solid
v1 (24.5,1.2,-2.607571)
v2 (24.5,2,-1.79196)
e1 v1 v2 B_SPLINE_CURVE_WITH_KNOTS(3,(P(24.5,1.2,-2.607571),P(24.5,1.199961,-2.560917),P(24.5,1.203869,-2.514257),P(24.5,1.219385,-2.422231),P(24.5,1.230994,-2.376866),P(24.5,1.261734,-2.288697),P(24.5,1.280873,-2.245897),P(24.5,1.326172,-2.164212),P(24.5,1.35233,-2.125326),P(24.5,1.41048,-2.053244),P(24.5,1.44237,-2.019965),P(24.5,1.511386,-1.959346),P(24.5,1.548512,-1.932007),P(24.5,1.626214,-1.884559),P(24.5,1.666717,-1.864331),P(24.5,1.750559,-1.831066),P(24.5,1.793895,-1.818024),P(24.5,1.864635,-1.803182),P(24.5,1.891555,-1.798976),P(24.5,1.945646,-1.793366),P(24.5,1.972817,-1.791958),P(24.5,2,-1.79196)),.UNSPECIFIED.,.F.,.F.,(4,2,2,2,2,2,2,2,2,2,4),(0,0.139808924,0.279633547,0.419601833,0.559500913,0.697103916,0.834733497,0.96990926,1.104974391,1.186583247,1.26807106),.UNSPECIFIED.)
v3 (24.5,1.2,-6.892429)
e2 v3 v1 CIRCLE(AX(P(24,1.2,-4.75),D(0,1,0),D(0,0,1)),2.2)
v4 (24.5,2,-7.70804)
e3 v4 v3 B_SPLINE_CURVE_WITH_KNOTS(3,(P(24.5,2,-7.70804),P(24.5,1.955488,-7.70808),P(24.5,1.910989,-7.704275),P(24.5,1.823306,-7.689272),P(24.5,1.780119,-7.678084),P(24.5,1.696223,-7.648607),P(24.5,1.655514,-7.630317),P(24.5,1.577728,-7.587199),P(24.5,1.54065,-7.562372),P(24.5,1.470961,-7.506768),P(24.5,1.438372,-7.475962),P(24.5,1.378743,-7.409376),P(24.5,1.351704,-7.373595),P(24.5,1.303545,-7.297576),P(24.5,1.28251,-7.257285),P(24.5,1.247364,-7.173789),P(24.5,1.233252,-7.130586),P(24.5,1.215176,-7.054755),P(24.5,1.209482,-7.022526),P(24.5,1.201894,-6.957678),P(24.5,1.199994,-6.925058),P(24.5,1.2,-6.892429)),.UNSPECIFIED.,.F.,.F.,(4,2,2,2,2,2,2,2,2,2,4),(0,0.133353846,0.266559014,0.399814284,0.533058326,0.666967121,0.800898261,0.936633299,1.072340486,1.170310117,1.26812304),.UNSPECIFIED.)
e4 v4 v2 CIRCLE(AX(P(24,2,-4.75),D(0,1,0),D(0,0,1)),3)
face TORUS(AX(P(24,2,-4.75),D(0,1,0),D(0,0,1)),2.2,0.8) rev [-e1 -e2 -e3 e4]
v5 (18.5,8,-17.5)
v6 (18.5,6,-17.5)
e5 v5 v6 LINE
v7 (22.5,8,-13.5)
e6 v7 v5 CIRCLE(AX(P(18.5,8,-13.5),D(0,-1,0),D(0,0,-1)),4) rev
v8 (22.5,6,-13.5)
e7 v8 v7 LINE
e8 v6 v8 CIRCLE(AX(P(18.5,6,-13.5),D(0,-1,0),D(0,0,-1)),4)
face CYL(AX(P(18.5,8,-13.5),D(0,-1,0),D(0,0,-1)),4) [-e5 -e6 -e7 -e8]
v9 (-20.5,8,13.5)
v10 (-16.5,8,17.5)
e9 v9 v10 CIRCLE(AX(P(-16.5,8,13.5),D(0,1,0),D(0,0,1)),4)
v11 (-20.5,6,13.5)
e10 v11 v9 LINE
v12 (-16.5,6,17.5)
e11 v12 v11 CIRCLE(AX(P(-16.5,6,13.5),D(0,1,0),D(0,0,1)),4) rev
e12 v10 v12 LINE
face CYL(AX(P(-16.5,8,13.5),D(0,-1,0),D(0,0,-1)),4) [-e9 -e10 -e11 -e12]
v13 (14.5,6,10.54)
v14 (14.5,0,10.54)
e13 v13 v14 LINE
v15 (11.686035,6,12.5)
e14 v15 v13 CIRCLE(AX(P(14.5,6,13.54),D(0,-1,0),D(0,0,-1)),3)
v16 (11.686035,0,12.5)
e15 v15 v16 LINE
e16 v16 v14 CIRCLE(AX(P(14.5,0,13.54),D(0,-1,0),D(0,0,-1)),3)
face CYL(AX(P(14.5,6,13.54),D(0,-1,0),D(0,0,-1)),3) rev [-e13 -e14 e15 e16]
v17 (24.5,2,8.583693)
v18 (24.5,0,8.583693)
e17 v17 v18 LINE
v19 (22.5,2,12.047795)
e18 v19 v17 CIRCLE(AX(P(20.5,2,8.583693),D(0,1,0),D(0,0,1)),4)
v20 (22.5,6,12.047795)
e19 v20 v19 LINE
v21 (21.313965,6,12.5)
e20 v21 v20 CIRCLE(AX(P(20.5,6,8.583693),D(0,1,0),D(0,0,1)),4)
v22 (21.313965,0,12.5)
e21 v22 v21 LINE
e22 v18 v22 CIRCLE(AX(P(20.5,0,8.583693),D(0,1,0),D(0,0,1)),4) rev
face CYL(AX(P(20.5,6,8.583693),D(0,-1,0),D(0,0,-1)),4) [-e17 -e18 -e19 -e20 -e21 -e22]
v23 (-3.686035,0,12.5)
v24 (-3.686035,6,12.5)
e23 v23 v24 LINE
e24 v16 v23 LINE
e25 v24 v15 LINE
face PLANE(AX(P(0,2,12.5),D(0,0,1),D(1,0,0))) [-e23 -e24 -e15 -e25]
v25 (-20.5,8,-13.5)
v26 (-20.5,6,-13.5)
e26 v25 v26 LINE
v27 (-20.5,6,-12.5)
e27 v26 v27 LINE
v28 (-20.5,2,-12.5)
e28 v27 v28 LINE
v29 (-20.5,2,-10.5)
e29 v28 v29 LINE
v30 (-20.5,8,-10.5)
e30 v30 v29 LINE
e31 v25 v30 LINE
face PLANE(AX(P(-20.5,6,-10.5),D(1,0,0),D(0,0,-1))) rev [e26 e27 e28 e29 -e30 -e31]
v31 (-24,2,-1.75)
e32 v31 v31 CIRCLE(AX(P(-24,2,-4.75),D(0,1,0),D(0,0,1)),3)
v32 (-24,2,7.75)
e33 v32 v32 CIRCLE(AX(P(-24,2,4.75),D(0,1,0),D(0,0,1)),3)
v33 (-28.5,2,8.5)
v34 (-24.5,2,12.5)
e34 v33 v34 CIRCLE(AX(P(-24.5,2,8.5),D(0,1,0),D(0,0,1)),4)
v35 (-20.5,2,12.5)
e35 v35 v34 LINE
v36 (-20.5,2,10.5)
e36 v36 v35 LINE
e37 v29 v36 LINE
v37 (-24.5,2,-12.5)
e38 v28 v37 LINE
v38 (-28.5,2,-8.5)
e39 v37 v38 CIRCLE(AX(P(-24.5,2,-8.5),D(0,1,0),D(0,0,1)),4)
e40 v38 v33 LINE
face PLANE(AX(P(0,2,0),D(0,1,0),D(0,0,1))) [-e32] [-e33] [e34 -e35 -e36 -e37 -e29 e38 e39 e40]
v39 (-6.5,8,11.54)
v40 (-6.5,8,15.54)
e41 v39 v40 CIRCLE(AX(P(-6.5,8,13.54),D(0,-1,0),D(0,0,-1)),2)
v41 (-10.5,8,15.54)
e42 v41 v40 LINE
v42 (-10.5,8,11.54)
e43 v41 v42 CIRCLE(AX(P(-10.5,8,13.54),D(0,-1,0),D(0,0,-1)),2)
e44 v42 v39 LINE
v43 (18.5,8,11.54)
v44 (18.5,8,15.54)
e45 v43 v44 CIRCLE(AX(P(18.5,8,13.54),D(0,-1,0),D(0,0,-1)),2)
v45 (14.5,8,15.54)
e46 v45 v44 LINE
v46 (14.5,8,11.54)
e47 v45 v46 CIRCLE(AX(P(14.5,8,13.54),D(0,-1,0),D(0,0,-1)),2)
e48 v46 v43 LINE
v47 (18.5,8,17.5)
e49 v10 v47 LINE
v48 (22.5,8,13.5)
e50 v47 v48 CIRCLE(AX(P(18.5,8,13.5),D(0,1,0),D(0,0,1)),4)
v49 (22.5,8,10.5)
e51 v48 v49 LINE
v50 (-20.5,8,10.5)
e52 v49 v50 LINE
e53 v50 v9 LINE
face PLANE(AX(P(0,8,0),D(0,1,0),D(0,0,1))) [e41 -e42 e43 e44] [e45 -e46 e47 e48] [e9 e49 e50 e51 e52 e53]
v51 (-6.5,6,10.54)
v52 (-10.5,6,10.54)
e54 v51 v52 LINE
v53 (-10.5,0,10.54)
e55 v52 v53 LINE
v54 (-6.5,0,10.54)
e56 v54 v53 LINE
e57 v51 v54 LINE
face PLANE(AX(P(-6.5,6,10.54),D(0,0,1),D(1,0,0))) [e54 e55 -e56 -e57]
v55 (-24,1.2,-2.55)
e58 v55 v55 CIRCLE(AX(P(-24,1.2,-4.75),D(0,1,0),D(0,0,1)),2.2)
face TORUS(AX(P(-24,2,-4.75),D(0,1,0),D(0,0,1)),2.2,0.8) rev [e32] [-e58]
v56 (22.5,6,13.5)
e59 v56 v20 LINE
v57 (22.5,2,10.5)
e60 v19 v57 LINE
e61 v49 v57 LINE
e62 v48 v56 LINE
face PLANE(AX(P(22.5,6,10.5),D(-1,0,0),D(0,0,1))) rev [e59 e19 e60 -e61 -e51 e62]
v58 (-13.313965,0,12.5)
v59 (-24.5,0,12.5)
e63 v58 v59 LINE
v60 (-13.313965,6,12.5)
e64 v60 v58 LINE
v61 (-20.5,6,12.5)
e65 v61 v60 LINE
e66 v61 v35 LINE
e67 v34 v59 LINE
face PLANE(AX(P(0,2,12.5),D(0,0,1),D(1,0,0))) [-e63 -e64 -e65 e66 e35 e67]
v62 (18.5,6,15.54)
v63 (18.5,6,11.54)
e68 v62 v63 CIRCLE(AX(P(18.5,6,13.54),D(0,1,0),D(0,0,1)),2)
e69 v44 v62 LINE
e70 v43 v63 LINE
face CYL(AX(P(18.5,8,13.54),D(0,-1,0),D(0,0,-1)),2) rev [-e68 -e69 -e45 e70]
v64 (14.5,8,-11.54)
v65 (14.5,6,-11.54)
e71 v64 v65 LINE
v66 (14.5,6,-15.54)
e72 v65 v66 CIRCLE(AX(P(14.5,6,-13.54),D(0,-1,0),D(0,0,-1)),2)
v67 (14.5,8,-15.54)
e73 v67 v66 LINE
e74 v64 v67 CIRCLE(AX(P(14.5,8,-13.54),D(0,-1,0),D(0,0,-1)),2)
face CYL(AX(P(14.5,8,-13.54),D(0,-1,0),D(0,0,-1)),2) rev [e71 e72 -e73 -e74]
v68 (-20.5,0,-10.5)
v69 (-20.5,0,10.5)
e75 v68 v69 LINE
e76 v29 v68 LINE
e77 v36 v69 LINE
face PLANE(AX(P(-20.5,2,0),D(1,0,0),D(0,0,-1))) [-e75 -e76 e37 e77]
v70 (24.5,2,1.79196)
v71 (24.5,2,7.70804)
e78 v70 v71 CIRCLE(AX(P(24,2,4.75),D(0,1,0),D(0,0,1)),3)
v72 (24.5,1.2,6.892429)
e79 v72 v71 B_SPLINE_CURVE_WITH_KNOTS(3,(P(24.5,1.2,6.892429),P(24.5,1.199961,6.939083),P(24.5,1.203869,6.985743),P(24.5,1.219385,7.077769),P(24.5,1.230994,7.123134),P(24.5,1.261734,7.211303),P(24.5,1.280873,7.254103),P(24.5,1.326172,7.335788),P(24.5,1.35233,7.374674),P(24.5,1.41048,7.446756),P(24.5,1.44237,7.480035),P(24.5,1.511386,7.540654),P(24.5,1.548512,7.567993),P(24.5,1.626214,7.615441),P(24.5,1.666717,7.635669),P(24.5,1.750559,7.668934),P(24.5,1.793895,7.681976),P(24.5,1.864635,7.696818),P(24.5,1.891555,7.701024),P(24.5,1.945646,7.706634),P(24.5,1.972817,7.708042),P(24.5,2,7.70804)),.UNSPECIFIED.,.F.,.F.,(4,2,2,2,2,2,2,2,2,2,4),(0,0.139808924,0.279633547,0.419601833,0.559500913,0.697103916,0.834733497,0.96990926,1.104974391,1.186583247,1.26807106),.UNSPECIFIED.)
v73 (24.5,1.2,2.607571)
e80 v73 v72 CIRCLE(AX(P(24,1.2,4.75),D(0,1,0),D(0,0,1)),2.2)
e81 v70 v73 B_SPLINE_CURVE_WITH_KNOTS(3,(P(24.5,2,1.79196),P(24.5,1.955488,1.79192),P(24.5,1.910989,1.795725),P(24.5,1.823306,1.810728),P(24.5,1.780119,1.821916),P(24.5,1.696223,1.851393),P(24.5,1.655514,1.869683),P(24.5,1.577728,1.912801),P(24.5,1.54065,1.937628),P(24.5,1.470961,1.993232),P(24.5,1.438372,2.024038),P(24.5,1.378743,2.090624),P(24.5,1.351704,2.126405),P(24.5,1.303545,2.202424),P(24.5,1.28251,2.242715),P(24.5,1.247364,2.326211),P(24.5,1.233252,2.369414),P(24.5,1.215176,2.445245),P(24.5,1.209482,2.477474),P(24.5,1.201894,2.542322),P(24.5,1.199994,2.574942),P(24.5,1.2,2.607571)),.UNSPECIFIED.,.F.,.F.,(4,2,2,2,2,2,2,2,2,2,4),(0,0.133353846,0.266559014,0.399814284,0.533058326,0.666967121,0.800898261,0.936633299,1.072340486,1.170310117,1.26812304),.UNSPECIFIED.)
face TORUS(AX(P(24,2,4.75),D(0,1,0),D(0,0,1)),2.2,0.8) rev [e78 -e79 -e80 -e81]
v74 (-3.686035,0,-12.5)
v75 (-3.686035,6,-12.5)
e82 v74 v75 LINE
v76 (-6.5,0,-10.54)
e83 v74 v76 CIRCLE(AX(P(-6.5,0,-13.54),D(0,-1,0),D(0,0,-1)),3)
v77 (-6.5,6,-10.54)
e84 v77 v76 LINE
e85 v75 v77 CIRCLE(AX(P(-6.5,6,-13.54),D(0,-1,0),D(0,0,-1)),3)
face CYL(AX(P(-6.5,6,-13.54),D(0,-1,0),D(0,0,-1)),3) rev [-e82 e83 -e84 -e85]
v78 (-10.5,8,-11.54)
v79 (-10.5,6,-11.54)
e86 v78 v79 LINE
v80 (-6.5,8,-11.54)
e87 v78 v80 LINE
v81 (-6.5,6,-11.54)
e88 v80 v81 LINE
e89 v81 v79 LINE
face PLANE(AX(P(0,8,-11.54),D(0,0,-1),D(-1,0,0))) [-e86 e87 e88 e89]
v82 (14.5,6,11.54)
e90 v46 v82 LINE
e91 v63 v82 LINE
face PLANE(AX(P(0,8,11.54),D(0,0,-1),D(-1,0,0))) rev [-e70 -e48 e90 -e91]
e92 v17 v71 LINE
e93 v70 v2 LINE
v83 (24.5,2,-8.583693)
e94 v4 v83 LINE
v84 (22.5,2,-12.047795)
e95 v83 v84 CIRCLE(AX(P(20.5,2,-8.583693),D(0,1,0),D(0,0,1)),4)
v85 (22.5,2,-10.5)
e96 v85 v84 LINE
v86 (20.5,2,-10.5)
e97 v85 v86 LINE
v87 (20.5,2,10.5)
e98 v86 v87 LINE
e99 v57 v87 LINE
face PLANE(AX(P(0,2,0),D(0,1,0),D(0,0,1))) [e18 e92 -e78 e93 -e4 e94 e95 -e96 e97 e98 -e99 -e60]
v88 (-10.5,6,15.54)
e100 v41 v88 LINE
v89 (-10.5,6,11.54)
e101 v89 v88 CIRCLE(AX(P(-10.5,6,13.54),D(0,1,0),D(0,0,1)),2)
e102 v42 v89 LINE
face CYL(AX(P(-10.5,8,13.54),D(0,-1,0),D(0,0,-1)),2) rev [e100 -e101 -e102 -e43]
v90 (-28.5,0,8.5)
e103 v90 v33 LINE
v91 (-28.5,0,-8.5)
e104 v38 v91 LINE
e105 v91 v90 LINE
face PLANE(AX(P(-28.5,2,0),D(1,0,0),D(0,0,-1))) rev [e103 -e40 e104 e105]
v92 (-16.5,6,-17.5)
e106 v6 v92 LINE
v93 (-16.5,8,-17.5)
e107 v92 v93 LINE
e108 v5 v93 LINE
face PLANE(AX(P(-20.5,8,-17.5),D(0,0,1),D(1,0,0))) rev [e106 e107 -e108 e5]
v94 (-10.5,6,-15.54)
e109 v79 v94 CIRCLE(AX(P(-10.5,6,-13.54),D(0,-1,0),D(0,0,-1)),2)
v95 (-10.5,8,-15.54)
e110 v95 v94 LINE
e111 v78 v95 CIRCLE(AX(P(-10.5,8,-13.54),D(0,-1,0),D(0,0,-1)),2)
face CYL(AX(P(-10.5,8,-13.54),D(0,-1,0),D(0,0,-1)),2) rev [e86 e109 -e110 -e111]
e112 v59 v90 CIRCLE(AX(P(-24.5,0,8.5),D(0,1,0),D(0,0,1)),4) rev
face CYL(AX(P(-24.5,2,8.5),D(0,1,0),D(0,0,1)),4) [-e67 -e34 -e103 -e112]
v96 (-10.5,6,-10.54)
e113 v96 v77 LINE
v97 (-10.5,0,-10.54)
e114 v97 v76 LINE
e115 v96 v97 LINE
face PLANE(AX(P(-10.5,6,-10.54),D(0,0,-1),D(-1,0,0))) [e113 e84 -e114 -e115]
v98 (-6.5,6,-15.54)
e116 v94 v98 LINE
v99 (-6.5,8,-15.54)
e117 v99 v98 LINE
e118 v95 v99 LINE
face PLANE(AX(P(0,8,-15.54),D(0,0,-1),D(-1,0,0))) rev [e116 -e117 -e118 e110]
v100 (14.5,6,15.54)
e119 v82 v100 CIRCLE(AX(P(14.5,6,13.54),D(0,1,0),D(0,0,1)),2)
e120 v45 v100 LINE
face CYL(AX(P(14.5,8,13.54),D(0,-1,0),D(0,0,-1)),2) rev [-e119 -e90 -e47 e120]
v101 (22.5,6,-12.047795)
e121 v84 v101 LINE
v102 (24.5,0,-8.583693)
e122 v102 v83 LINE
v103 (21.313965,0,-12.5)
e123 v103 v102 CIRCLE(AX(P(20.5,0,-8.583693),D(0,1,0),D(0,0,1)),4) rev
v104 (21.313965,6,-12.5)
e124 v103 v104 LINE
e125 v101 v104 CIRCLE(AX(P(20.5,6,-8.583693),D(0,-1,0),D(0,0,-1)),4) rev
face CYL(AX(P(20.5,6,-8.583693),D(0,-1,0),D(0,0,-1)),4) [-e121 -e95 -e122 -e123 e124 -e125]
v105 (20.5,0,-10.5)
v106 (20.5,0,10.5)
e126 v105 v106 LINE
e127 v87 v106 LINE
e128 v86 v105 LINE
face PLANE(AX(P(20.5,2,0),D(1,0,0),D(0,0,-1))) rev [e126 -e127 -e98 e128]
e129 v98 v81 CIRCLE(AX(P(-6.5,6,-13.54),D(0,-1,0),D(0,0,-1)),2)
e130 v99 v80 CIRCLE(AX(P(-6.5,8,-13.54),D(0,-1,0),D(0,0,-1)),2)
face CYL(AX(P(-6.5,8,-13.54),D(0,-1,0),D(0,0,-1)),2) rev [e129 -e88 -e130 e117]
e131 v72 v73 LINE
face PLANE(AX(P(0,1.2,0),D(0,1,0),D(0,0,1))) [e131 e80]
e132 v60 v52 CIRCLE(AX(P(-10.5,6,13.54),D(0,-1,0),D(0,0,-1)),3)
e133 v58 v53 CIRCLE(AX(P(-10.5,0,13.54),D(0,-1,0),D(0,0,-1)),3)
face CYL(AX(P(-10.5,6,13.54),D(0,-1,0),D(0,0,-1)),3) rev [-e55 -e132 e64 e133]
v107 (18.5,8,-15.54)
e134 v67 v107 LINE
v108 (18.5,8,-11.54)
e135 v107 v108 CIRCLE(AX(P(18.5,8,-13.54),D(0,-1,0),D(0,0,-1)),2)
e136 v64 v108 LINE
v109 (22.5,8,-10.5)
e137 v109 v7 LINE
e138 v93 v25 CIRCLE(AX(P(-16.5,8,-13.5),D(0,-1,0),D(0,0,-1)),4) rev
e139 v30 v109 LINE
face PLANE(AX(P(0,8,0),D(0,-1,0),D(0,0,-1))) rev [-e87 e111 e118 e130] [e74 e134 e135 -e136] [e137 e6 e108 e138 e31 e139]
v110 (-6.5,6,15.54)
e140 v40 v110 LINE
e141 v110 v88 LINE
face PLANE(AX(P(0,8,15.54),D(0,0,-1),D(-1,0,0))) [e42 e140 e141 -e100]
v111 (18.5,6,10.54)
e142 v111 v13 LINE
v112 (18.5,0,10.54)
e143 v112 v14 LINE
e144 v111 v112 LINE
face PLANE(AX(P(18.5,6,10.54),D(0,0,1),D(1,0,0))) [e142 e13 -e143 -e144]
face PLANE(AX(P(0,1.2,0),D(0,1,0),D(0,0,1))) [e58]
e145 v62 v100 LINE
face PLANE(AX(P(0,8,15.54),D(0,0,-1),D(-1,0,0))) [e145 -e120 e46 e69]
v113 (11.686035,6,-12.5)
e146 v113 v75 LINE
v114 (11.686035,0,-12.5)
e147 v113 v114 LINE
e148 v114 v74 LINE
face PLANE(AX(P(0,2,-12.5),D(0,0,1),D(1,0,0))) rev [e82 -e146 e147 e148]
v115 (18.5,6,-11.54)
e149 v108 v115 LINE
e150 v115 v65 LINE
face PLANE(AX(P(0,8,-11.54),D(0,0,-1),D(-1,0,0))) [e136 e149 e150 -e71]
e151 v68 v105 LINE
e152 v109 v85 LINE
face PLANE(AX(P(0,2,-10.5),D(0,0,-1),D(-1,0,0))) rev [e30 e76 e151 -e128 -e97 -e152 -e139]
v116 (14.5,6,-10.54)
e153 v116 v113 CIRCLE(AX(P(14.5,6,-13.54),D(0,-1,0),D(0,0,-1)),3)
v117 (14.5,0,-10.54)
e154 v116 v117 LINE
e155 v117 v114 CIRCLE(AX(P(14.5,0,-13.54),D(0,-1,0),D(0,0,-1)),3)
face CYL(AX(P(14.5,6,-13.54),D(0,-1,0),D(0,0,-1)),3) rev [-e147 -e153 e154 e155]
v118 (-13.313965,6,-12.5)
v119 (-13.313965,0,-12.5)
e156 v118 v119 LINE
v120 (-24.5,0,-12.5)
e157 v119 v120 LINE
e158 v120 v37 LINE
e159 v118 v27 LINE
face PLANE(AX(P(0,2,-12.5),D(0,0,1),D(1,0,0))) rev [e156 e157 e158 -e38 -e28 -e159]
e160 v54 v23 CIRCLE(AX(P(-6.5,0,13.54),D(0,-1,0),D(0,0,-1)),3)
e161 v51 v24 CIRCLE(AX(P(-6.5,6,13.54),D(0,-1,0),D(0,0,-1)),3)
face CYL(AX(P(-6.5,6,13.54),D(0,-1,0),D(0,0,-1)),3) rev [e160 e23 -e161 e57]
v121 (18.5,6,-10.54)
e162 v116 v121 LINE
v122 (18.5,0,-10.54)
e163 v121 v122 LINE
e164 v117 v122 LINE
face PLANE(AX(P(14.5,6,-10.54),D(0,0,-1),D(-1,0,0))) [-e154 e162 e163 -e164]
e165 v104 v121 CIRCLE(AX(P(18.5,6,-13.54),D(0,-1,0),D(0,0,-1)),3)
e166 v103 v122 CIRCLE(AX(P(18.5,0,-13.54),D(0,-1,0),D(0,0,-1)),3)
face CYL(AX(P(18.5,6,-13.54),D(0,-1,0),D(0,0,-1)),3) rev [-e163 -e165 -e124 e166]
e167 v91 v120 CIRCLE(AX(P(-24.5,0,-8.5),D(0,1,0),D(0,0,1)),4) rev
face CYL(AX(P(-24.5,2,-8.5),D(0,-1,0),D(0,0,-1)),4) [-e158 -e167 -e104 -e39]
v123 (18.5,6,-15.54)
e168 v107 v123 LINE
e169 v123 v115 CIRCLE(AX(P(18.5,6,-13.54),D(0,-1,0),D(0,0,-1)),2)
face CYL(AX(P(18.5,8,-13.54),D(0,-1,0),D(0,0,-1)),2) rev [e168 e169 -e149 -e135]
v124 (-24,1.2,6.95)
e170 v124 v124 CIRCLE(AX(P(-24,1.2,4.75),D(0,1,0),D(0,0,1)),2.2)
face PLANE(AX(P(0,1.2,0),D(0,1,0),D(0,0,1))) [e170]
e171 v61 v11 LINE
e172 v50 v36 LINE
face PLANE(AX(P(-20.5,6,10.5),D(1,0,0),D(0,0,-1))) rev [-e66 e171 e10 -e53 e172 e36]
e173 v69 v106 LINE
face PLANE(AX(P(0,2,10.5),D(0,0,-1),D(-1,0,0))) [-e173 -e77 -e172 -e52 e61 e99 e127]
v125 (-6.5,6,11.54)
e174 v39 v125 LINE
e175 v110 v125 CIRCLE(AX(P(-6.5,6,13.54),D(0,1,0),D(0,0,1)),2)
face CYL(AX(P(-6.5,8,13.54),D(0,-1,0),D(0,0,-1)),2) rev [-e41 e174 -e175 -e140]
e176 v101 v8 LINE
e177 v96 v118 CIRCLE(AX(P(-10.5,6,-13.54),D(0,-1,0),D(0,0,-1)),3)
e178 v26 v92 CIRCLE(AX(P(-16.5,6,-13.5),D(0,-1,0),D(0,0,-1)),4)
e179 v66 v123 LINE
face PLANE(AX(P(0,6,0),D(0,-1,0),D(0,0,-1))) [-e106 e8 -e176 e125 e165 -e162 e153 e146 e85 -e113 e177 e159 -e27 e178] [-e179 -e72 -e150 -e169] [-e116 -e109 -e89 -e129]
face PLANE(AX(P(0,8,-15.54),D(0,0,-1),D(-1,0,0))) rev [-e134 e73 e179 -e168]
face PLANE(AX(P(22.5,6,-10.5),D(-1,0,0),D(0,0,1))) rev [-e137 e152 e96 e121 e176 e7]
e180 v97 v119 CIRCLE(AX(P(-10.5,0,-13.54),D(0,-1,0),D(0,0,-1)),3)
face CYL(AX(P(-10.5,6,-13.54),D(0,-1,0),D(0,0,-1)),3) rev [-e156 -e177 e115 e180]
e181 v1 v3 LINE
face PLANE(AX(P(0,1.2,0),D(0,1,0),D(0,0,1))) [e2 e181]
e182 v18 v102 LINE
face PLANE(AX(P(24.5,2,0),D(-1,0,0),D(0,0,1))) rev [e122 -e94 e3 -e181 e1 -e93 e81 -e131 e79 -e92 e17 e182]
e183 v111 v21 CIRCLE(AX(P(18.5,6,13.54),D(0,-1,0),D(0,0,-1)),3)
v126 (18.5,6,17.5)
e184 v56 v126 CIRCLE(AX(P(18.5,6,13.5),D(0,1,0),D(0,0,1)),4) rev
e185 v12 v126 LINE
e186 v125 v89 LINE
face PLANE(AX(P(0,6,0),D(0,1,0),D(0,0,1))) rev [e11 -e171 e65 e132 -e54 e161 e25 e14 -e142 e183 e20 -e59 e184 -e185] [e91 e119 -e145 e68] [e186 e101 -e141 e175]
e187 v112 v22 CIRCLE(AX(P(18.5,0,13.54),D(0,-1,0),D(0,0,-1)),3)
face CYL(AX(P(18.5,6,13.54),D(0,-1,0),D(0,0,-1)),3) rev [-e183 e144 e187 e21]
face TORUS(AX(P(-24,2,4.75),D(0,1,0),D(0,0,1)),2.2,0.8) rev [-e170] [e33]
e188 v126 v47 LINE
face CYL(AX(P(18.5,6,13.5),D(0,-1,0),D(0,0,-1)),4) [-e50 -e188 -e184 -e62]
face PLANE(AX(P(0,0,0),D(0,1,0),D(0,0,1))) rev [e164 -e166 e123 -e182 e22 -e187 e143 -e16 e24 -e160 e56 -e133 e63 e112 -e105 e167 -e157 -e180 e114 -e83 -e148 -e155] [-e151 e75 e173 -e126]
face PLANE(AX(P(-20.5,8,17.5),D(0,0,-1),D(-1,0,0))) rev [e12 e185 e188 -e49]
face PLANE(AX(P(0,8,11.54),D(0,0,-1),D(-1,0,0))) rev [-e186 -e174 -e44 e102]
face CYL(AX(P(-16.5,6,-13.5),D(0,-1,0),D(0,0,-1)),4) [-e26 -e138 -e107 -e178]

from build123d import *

# Parameters (mm, degrees)
EXTRUDE_2_DEPTH     = 2
CUT_EXTRUDE_2_DEPTH = 0.8
FILLET_1_R          = 0.8
SKETCH_6_W          = 43
SKETCH_6_H          = 2
SKETCH_6_H_2        = 1.9999999999999947
EXTRUDE_3_DEPTH     = 4
SKETCH_7_W          = 43
SKETCH_7_H          = 6.999999999999998
EXTRUDE_4_DEPTH     = 2
CUT_EXTRUDE_3_DEPTH = 35.3874977280988
CUT_EXTRUDE_5_DEPTH = 6
FILLET_2_R          = 4
FILLET_3_R          = 4
FILLET_4_R          = 4


# Some blends are built 0.0001 mm under size
with BuildPart() as part:
    # 草图4 → 凸台-拉伸2 (new body)
    with BuildSketch(Plane(origin=(0, 0, 0), x_dir=(1, 0, 0), z_dir=(0, 1, 0))):
        Polygon((24.499999999999996, -12.499999999999993), (24.499999999999996, 10.5), (24.499999999999996, 12.5), (-24.500000000000004, 12.5), (-28.500000000000004, 12.5), (-28.500000000000004, -12.499999999999993), (-24.500000000000004, -12.499999999999993), align=None)
        Polygon((-20.500000000000004, 10.500000000000002), (20.499999999999996, 10.5), (20.500000000000004, -10.5), (-20.5, -10.499999999999998), align=None, mode=Mode.SUBTRACT)
    extrude(amount=EXTRUDE_2_DEPTH)

    # 草图5 → 切除-拉伸2 (cut)
    with BuildSketch(Plane(origin=(0, 2, 0), x_dir=(1, 0, 0), z_dir=(0, 1, 0))):
        with BuildLine():
            Line((-24.000000000000004, 1.7499999999999991), (-24.000000000000004, 4.75))
            Line((-24.000000000000004, 4.75), (-21.000000000000004, 4.75))
            ThreePointArc((-21.000000000000004, 4.75), (-26.121320343559606, 6.871320343559683), (-24.000000000000117, 1.7499999999999991))
        make_face()
        with BuildLine():
            Line((-21.000000000000004, 4.75), (-24.000000000000004, 4.75))
            Line((-24.000000000000004, 4.75), (-24.000000000000004, 1.7499999999999991))
            ThreePointArc((-24.000000000000117, 1.7499999999999991), (-21.8786796564404, 2.6286796564403168), (-21.000000000000004, 4.749999999999999))
        make_face()
        with BuildLine():
            ThreePointArc((-21.000000000000007, -4.75), (-21.8786796564404, -2.6286796564403203), (-24.000000000000114, -1.7500000000000027))
            Line((-24.000000000000004, -1.7500000000000027), (-24.000000000000004, -4.75))
            Line((-24.000000000000004, -4.75), (-21.000000000000007, -4.75))
        make_face()
        with BuildLine():
            Line((-24.000000000000004, -4.75), (-24.000000000000004, -1.7500000000000027))
            ThreePointArc((-24.000000000000114, -1.7500000000000027), (-26.121320343559606, -6.871320343559679), (-21.000000000000007, -4.750000000000001))
            Line((-21.000000000000007, -4.75), (-24.000000000000004, -4.75))
        make_face()
        with BuildLine():
            Line((23.999999999999996, 4.75), (20.999999999999996, 4.75))
            ThreePointArc((21, 4.75), (21.878679656440315, 2.628679656440399), (23.999999999999883, 1.7500000000000027))
            Line((23.999999999999996, 1.7500000000000027), (23.999999999999996, 4.75))
        make_face()
        with BuildLine():
            ThreePointArc((24.50000000000003, 7.7080398915498), (22.063508326896304, 7.041287847477928), (21, 4.75))
            Line((20.999999999999996, 4.75), (23.999999999999996, 4.75))
            Line((23.999999999999996, 4.75), (23.999999999999996, 1.7500000000000027))
            ThreePointArc((23.999999999999883, 1.7500000000000027), (24.250878780839006, 1.760508431635119), (24.500000000000025, 1.7919601084501995))
            Line((24.499999999999996, 1.7919601084502048), (24.499999999999996, 7.708039891549795))
        make_face()
        with BuildLine():
            ThreePointArc((24.500000000000025, -1.7919601084501955), (24.25087878083901, -1.7605084316351154), (23.99999999999989, -1.7499999999999991))
            Line((24, -1.7499999999999991), (24, -4.75))
            Line((23.999999999999996, -4.75), (20.999999999999996, -4.75))
            ThreePointArc((21, -4.75), (22.0635083268963, -7.041287847477928), (24.50000000000002, -7.708039891549806))
            Line((24.499999999999996, -7.7080398915498005), (24.499999999999996, -1.7919601084501995))
        make_face()
        with BuildLine():
            Line((24, -4.75), (24, -1.7499999999999991))
            ThreePointArc((23.99999999999989, -1.7499999999999991), (21.87867965644032, -2.6286796564403963), (21, -4.75))
            Line((20.999999999999996, -4.75), (23.999999999999996, -4.75))
        make_face()
    extrude(amount=-CUT_EXTRUDE_2_DEPTH, mode=Mode.SUBTRACT)

    # 圆角1
    fillet_1_edges = [part.edges().sort_by_distance(p)[0] for p in [
        (21.000000000000117, 1.2, 4.749999999999868),
        (21, 1.2, -4.75),
        (-26.999999999999993, 1.2, 4.749999999999993),
        (-23.99999999999989, 1.2, -7.749999999999999),
    ]]
    fillet(fillet_1_edges, radius=FILLET_1_R - 0.0001)  # a hair under: the kernel refuses the full size

    # 草图6 → 凸台-拉伸3 (add)
    with BuildSketch(Plane(origin=(0, 2, 0), x_dir=(1, 0, 0), z_dir=(0, 1, 0))):
        with Locations((0.9999999999999947, 11.500000000000002)):
            Rectangle(SKETCH_6_W, SKETCH_6_H)
        with Locations((0.9999999999999982, -11.499999999999996)):
            Rectangle(SKETCH_6_W, SKETCH_6_H_2)
    extrude(amount=EXTRUDE_3_DEPTH)

    # 草图7 → 凸台-拉伸4 (add)
    with BuildSketch(Plane(origin=(0, 6, 0), x_dir=(1, 0, 0), z_dir=(0, 1, 0))):
        with Locations((0.9999999999999947, 14)):
            Rectangle(SKETCH_7_W, SKETCH_7_H)
        with Locations((0.9999999999999982, -13.999999999999996)):
            Rectangle(SKETCH_7_W, SKETCH_7_H)
    extrude(amount=EXTRUDE_4_DEPTH)

    # 草图8 → 切除-拉伸3 (cut, through all)
    with BuildSketch(Plane.XZ):
        with BuildLine():
            ThreePointArc((-10.5, -11.54), (-12.5, -13.54), (-10.5, -15.54))
            Line((-10.5, -15.54), (-6.500000000000001, -15.54))
            ThreePointArc((-6.500000000000001, -15.54), (-4.500000000000001, -13.54), (-6.500000000000001, -11.54))
            Line((-6.500000000000001, -11.54), (-10.5, -11.54))
        make_face()
        with BuildLine():
            ThreePointArc((14.5, -11.54), (12.5, -13.54), (14.5, -15.54))
            Line((14.5, -15.54), (18.500000000000004, -15.54))
            ThreePointArc((18.500000000000004, -15.54), (20.500000000000004, -13.54), (18.500000000000004, -11.54))
            Line((18.500000000000004, -11.54), (14.5, -11.54))
        make_face()
        with BuildLine():
            Line((-10.500000000000096, 11.54), (-6.500000000000095, 11.54))
            ThreePointArc((-6.500000000000095, 11.54), (-4.500000000000095, 13.54), (-6.500000000000095, 15.54))
            Line((-6.500000000000095, 15.54), (-10.500000000000096, 15.54))
            ThreePointArc((-10.500000000000096, 15.54), (-12.500000000000096, 13.54), (-10.500000000000096, 11.54))
        make_face()
        with BuildLine():
            Line((14.499999999999908, 11.54), (18.499999999999904, 11.54))
            ThreePointArc((18.499999999999904, 11.540000000000001), (20.499999999999904, 13.540000000000001), (18.499999999999904, 15.540000000000001))
            Line((18.499999999999904, 15.54), (14.499999999999908, 15.54))
            ThreePointArc((14.499999999999908, 15.54), (12.499999999999908, 13.54), (14.499999999999908, 11.54))
        make_face()
    extrude(amount=-CUT_EXTRUDE_3_DEPTH, mode=Mode.SUBTRACT)

    # 草图9 → 切除-拉伸5 (cut)
    with BuildSketch(Plane.XZ):
        with BuildLine():
            Line((14.5, -10.540000000000001), (18.500000000000004, -10.54))
            ThreePointArc((18.500000000000004, -10.54), (21.500000000000004, -13.54), (18.500000000000004, -16.54))
            Line((18.500000000000004, -16.54), (14.5, -16.54))
            ThreePointArc((14.5, -16.54), (11.500000000000002, -13.54), (14.5, -10.540000000000001))
        make_face()
        with BuildLine():
            Line((-10.5, -10.540000000000177), (-6.499999999999999, -10.540000000000175))
            ThreePointArc((-6.499999999999999, -10.540000000000175), (-3.500000000000001, -13.540000000000175), (-6.499999999999999, -16.540000000000173))
            Line((-6.499999999999999, -16.540000000000173), (-10.5, -16.540000000000173))
            ThreePointArc((-10.5, -16.540000000000173), (-13.499999999999998, -13.540000000000175), (-10.5, -10.540000000000177))
        make_face()
        with BuildLine():
            Line((-10.500000000000094, 16.539999999999825), (-6.500000000000092, 16.539999999999825))
            ThreePointArc((-6.500000000000092, 16.539999999999825), (-3.5000000000000924, 13.539999999999827), (-6.500000000000092, 10.539999999999827))
            Line((-6.500000000000092, 10.539999999999827), (-10.500000000000094, 10.539999999999827))
            ThreePointArc((-10.500000000000094, 10.539999999999827), (-13.500000000000092, 13.539999999999827), (-10.500000000000094, 16.539999999999825))
        make_face()
        with BuildLine():
            Line((14.499999999999906, 16.54), (18.499999999999908, 16.54))
            ThreePointArc((18.499999999999908, 16.54), (21.499999999999908, 13.54), (18.499999999999908, 10.540000000000001))
            Line((18.499999999999908, 10.540000000000001), (14.499999999999906, 10.540000000000001))
            ThreePointArc((14.499999999999906, 10.540000000000001), (11.499999999999906, 13.54), (14.499999999999906, 16.54))
        make_face()
    extrude(amount=-CUT_EXTRUDE_5_DEPTH, mode=Mode.SUBTRACT)

    # 圆角2
    # the kernel refuses this fillet: 4 mm, written as the material it takes off along each edge
    with BuildSketch(Plane(origin=(24.499999999999996, -9.790767556640994, 12.499999999999993), x_dir=(0, 0, -1), z_dir=(0, 1, 0))) as fillet_2_piece_1_section:
        with BuildLine():
            CenterArc((3.9163070226563974, 4), FILLET_2_R, 191.74119504503736, 78.25880495496267)
            Line((6.39666e-12, 3.186034826087571), (0, 0))
            Line((0, 0), (3.9163070226563974, 0))
        make_face()
    fillet_2_piece_1 = extrude(amount=21.581535113281987, mode=Mode.PRIVATE)
    fillet_2_piece_1 = split(fillet_2_piece_1, bisect_by=Plane(origin=(23.971029818368024, 6, 10.5876929773436), z_dir=(0, -1, 0)), keep=Keep.TOP, mode=Mode.PRIVATE)
    add(fillet_2_piece_1, mode=Mode.SUBTRACT)
    with BuildSketch(Plane(origin=(24.499999999999996, -9.790767556640994, -12.5), x_dir=(0, 0, 1), z_dir=(0, 1, 0))) as fillet_2_piece_2_section:
        with BuildLine():
            CenterArc((3.9163070226563974, -4), FILLET_2_R, 90, 78.25880495496122)
            Line((6.4162e-12, -3.186034826087475), (0, 0))
            Line((0, 0), (3.9163070226563974, 0))
        make_face()
    fillet_2_piece_2 = extrude(amount=21.581535113281987, mode=Mode.PRIVATE)
    fillet_2_piece_2 = split(fillet_2_piece_2, bisect_by=Plane(origin=(23.97102981836802, 6, -10.58769297734361), z_dir=(0, -1, 0)), keep=Keep.TOP, mode=Mode.PRIVATE)
    add(fillet_2_piece_2, mode=Mode.SUBTRACT)
    with BuildSketch(Plane(origin=(22.499999999999993, -4, -17.5), x_dir=(-1, 0, 0), z_dir=(0, 1, 0))) as fillet_2_piece_3:
        with BuildLine():
            CenterArc((FILLET_2_R, FILLET_2_R), FILLET_2_R, 180, 90)
            Line((0, FILLET_2_R), (0, 0))
            Line((0, 0), (FILLET_2_R, 0))
        make_face()
    extrude(amount=22, mode=Mode.SUBTRACT)
    with BuildSketch(Plane(origin=(22.499999999999996, -4, 17.499999999999996), x_dir=(-1, 0, 0), z_dir=(0, 1, 0))) as fillet_2_piece_4:
        with BuildLine():
            CenterArc((FILLET_2_R, -FILLET_2_R), FILLET_2_R, 90, 90)
            Line((0, -FILLET_2_R), (0, 0))
            Line((0, 0), (FILLET_2_R, 0))
        make_face()
    extrude(amount=22, mode=Mode.SUBTRACT)

    # 圆角3
    fillet_3_edges = [part.edges().sort_by_distance(p)[0] for p in [
        (-28.500000000000004, 1, 12.499999999999993),
        (-28.500000000000004, 1, -12.5),
    ]]
    fillet(fillet_3_edges, radius=FILLET_3_R)

    # 圆角4
    fillet_4_edges = [part.edges().sort_by_distance(p)[0] for p in [
        (-20.5, 7, 17.499999999999996),
        (-20.500000000000004, 7, -17.5),
    ]]
    fillet(fillet_4_edges, radius=FILLET_4_R)


solid = part.part
